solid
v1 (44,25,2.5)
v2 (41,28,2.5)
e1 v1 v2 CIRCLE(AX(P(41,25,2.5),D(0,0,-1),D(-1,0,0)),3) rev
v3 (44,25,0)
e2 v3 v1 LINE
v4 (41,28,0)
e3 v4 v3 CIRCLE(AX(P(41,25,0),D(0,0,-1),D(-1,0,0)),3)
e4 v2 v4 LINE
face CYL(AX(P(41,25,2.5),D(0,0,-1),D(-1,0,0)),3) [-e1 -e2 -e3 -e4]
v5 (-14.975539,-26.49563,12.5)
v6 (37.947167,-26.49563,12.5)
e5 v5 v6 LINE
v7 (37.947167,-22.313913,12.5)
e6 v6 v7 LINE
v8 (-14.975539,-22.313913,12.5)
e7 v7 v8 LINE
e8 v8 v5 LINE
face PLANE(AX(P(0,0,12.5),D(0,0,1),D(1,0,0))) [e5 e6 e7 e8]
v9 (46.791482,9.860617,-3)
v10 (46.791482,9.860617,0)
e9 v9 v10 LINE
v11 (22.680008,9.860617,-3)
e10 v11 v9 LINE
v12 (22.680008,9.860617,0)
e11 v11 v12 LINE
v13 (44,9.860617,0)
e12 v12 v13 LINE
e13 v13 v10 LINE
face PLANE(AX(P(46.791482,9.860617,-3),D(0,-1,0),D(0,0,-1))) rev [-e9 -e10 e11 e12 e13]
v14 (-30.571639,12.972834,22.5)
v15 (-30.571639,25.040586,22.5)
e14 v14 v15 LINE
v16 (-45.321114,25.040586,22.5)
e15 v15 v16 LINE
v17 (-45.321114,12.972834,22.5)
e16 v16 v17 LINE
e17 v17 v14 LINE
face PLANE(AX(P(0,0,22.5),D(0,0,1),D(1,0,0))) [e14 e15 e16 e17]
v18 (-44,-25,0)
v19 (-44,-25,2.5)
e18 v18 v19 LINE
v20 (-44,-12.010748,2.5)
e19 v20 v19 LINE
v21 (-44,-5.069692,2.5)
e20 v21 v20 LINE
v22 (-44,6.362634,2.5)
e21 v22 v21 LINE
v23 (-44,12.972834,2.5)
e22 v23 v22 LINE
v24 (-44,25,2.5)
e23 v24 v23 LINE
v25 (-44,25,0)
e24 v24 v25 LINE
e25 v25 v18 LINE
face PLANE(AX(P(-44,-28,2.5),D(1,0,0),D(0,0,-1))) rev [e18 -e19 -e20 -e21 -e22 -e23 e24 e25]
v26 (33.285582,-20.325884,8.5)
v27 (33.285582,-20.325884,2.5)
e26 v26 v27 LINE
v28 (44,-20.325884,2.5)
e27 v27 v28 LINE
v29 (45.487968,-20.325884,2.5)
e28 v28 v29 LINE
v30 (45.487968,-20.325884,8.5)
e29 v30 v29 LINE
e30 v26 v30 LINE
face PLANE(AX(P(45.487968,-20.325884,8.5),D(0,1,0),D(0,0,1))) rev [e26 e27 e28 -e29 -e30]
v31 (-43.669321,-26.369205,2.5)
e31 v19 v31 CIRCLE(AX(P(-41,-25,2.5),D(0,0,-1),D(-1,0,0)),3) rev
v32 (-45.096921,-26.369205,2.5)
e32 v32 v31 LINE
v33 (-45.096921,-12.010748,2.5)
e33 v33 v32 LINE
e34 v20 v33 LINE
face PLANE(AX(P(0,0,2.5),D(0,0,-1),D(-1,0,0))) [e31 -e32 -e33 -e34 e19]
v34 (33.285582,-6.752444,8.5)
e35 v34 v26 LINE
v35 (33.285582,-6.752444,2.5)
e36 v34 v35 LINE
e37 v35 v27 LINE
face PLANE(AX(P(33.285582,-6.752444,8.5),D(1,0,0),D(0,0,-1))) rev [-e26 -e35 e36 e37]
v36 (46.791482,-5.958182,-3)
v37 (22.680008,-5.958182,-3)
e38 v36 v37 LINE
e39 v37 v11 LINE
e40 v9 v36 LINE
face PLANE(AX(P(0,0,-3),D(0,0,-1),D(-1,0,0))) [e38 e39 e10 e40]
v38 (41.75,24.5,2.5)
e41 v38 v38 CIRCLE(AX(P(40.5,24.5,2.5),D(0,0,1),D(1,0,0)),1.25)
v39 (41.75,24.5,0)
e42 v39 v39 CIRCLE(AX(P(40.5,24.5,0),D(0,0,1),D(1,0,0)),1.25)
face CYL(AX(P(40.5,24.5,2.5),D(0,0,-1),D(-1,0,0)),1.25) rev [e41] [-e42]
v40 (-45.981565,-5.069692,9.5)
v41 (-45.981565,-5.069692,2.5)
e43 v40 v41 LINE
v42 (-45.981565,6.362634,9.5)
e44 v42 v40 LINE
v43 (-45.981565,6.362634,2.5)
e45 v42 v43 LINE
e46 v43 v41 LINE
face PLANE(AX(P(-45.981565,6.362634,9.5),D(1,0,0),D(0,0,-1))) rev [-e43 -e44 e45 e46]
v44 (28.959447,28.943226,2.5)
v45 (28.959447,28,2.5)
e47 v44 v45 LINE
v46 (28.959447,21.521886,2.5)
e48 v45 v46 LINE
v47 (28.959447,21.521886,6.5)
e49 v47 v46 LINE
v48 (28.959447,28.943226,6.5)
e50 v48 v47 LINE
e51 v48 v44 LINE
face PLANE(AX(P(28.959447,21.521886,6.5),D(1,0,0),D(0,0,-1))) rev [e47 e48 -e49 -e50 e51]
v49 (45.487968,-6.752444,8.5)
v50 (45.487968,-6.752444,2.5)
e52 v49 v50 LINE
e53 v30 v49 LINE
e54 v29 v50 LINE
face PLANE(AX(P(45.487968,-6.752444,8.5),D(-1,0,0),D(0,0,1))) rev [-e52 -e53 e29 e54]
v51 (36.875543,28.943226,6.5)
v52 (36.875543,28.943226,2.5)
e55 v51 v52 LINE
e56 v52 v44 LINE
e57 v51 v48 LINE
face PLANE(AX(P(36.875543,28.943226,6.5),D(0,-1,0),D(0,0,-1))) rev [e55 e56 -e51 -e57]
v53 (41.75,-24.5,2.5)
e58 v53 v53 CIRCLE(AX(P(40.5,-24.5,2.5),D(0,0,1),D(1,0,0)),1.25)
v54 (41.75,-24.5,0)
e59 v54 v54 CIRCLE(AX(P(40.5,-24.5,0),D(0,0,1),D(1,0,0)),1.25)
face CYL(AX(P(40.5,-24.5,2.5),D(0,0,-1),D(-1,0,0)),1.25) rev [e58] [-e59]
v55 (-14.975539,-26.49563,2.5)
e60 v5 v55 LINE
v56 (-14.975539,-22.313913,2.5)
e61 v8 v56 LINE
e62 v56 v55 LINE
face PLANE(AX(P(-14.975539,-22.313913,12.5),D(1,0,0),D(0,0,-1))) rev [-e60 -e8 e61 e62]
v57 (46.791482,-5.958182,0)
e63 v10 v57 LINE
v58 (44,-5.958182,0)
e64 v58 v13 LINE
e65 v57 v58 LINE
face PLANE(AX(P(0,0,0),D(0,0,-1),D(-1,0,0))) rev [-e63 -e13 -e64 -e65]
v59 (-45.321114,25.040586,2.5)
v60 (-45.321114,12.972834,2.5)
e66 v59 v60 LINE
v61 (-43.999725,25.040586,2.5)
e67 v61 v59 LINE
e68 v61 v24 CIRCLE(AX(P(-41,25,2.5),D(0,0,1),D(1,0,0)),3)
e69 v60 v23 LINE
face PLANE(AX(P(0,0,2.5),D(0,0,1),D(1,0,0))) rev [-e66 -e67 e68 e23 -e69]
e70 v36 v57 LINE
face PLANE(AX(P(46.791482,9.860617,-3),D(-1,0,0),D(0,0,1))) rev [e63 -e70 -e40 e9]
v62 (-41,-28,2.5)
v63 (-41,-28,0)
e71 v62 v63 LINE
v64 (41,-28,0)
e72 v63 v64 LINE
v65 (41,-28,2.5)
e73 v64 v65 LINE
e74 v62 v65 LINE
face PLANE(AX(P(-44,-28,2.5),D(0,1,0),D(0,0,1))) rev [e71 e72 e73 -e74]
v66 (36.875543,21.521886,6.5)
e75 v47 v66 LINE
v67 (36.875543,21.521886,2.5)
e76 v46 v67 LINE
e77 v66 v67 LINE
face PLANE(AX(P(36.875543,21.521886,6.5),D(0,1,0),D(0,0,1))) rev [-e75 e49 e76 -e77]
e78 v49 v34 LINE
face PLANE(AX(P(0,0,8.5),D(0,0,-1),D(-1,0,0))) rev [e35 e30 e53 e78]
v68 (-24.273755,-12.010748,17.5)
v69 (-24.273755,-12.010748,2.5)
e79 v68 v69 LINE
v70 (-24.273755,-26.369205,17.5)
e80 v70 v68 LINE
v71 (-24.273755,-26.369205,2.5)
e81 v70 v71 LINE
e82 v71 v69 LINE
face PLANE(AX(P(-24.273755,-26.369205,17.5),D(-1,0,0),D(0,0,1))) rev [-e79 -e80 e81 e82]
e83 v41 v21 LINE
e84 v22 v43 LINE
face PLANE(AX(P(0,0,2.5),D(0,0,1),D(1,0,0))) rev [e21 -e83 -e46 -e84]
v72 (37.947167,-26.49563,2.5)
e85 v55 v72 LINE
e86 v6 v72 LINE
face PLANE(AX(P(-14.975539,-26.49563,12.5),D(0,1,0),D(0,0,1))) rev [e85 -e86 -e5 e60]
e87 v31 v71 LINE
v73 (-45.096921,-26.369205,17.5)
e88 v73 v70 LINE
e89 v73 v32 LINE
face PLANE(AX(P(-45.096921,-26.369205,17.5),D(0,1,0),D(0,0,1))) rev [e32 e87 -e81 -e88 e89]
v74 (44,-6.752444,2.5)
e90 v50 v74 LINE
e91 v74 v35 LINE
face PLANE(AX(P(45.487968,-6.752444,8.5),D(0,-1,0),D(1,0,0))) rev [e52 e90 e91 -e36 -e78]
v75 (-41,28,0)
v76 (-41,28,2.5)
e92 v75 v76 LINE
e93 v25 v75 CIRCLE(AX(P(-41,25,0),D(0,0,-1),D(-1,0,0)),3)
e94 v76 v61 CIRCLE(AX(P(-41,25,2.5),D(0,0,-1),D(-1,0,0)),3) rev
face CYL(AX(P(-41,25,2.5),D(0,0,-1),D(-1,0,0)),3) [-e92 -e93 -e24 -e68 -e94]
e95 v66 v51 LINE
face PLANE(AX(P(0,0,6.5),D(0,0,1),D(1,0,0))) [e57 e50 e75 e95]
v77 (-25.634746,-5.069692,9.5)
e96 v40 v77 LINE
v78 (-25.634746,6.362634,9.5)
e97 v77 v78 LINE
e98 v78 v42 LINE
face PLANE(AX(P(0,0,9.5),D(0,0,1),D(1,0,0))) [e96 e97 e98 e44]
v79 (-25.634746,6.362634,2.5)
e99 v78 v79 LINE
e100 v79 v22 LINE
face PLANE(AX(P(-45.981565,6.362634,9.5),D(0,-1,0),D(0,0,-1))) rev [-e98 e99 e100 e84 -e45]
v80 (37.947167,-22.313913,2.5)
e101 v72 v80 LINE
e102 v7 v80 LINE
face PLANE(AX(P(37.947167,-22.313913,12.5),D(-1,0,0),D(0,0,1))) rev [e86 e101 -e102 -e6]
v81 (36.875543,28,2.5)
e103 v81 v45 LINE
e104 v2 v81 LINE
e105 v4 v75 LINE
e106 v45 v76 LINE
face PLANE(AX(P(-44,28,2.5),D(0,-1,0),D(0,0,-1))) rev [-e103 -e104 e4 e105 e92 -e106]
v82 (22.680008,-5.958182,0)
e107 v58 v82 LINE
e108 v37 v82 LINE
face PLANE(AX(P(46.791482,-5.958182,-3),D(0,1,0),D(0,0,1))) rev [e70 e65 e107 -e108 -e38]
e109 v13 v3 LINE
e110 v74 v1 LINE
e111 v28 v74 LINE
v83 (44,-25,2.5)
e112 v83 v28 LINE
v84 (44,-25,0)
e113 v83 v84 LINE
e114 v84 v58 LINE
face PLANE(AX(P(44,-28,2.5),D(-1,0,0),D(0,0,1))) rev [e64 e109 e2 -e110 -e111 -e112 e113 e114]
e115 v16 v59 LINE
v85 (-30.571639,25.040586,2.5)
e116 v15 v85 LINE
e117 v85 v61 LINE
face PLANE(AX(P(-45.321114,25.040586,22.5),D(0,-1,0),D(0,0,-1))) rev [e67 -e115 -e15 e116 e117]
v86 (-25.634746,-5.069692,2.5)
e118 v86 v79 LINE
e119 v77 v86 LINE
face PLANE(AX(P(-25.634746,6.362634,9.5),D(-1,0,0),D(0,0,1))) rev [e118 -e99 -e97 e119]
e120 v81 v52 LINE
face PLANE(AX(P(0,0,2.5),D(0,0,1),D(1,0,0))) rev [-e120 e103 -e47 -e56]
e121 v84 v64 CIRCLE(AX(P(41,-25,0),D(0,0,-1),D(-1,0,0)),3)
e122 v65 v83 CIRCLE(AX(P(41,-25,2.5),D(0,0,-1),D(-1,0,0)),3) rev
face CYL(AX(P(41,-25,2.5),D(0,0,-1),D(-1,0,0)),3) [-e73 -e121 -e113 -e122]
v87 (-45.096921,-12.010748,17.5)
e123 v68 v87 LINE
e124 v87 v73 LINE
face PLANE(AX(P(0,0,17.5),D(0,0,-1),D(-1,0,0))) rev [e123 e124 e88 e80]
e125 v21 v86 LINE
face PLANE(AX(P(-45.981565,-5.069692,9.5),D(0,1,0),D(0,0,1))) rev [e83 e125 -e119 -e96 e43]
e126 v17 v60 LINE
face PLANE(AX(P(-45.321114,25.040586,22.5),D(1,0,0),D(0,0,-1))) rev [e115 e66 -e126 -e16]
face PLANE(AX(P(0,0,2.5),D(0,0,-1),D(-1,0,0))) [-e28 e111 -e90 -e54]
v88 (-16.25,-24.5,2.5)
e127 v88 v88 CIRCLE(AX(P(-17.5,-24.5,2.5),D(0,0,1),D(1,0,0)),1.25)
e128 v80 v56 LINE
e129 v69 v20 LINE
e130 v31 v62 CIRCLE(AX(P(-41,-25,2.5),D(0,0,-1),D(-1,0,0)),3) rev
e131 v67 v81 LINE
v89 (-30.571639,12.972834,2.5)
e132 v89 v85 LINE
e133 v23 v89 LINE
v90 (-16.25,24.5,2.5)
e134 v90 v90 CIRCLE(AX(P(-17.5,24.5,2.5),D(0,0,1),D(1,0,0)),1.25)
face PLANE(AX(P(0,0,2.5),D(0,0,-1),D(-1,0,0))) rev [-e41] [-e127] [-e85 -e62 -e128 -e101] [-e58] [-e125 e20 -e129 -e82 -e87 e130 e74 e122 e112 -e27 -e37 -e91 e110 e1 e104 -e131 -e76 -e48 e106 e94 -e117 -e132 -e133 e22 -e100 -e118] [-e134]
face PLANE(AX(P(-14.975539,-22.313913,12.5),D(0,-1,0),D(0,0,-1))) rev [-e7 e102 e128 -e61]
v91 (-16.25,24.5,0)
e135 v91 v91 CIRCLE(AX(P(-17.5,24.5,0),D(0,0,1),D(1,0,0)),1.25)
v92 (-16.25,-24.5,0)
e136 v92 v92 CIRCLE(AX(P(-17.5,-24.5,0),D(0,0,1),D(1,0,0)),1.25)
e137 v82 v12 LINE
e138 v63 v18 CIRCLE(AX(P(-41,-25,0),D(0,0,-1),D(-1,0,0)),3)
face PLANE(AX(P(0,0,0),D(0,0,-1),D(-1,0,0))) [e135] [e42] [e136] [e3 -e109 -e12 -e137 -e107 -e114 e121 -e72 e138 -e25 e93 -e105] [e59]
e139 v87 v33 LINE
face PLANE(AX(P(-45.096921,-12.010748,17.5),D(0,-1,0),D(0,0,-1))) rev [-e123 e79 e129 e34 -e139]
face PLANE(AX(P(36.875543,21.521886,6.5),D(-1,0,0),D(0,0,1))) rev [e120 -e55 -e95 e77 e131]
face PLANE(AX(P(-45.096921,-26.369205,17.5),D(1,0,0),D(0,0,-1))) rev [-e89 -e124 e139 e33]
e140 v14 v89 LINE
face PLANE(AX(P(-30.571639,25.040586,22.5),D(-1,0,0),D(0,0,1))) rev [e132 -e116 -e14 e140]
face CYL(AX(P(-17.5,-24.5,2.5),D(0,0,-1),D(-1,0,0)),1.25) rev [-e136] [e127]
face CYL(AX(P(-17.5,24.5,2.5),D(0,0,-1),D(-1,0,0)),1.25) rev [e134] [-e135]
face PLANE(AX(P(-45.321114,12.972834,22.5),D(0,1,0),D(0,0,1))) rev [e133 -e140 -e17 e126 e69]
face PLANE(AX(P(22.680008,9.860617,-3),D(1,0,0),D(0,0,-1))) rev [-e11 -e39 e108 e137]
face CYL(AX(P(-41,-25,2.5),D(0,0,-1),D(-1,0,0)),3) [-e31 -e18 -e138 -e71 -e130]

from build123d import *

# Parameters (mm, degrees)
SKETCH_1_W      = 88
SKETCH_1_H      = 56
SKETCH_1_R      = 1.25
EXTRUDE_1_DEPTH = 2.5
SKETCH_3_W      = 14.749474834
SKETCH_3_H      = 12.067752137
EXTRUDE_2_DEPTH = 20
SKETCH_4_W      = 20.823165918
SKETCH_4_H      = 14.358457545
EXTRUDE_3_DEPTH = 15
SKETCH_5_W      = 20.346818985
SKETCH_5_H      = 11.432326386
EXTRUDE_4_DEPTH = 7
SKETCH_6_W      = 52.92270657
SKETCH_6_H      = 4.181716452
EXTRUDE_5_DEPTH = 10
SKETCH_7_W      = 12.202385712
SKETCH_7_H      = 13.573440286
EXTRUDE_6_DEPTH = 6
SKETCH_8_W      = 24.111474105
SKETCH_8_H      = 15.818799485
EXTRUDE_7_DEPTH = 3
SKETCH_9_W      = 7.916095885
SKETCH_9_H      = 7.421339892
EXTRUDE_8_DEPTH = 4
FILLET_1_R      = 3


with BuildPart() as part:
    # 草图1 → 凸台-拉伸1 (new body)
    with BuildSketch(Plane.XY):
        Rectangle(SKETCH_1_W, SKETCH_1_H)
        with Locations((-17.5, 24.5)):
            Circle(SKETCH_1_R, mode=Mode.SUBTRACT)
        with Locations((40.5, 24.5)):
            Circle(SKETCH_1_R, mode=Mode.SUBTRACT)
        with Locations((40.5, -24.5)):
            Circle(SKETCH_1_R, mode=Mode.SUBTRACT)
        with Locations((-17.5, -24.5)):
            Circle(SKETCH_1_R, mode=Mode.SUBTRACT)
    extrude(amount=EXTRUDE_1_DEPTH)

    # 草图3 → 凸台-拉伸2 (add)
    with BuildSketch(Plane.XY.offset(2.5)):
        with Locations((-37.946376164, 19.006709616)):
            Rectangle(SKETCH_3_W, SKETCH_3_H)
    extrude(amount=EXTRUDE_2_DEPTH)

    # 草图4 → 凸台-拉伸3 (add)
    with BuildSketch(Plane.XY.offset(2.5)):
        with Locations((-34.685337702, -19.189976435)):
            Rectangle(SKETCH_4_W, SKETCH_4_H)
    extrude(amount=EXTRUDE_3_DEPTH)

    # 草图5 → 凸台-拉伸4 (add)
    with BuildSketch(Plane.XY.offset(2.5)):
        with Locations((-35.808155473, 0.646470837)):
            Rectangle(SKETCH_5_W, SKETCH_5_H)
    extrude(amount=EXTRUDE_4_DEPTH)

    # 草图6 → 凸台-拉伸5 (add)
    with BuildSketch(Plane.XY.offset(2.5)):
        with Locations((11.485814144, -24.404771423)):
            Rectangle(SKETCH_6_W, SKETCH_6_H)
    extrude(amount=EXTRUDE_5_DEPTH)

    # 草图7 → 凸台-拉伸6 (add)
    with BuildSketch(Plane.XY.offset(2.5)):
        with Locations((39.386774732, -13.539163922)):
            Rectangle(SKETCH_7_W, SKETCH_7_H)
    extrude(amount=EXTRUDE_6_DEPTH)

    # 草图8 → 凸台-拉伸7 (add)
    with BuildSketch(Plane(origin=(0, 0, 0), x_dir=(-1, 0, 0), z_dir=(0, 0, -1))):
        with Locations((-34.735744668, 1.951217558)):
            Rectangle(SKETCH_8_W, SKETCH_8_H)
    extrude(amount=EXTRUDE_7_DEPTH)

    # 草图9 → 凸台-拉伸8 (add)
    with BuildSketch(Plane.XY.offset(2.5)):
        with Locations((32.917495051, 25.232555635)):
            Rectangle(SKETCH_9_W, SKETCH_9_H)
    extrude(amount=EXTRUDE_8_DEPTH)

    # 圆角1
    # the kernel refuses this fillet: 3 mm, written as the material it takes off along each edge
    with BuildSketch(Plane(origin=(44, -28, -7.5), x_dir=(-1, 0, 0), z_dir=(0, 0, 1)), Plane(origin=(44, 28, -7.5), x_dir=(0, -1, 0), z_dir=(0, 0, 1))) as fillet_1_piece_1:
        with BuildLine():
            CenterArc((FILLET_1_R, -FILLET_1_R), FILLET_1_R, 90, 90)
            Line((0, -FILLET_1_R), (0, 0))
            Line((0, 0), (FILLET_1_R, 0))
        make_face()
    extrude(amount=17.5, mode=Mode.SUBTRACT)
    with BuildSketch(Plane(origin=(-44, -28, -7.5), x_dir=(1, 0, 0), z_dir=(0, 0, 1)), Plane(origin=(-44, 28, -7.5), x_dir=(0, -1, 0), z_dir=(0, 0, 1))) as fillet_1_piece_2:
        with BuildLine():
            CenterArc((FILLET_1_R, FILLET_1_R), FILLET_1_R, 180, 90)
            Line((0, FILLET_1_R), (0, 0))
            Line((0, 0), (FILLET_1_R, 0))
        make_face()
    extrude(amount=10, mode=Mode.SUBTRACT)


solid = part.part
